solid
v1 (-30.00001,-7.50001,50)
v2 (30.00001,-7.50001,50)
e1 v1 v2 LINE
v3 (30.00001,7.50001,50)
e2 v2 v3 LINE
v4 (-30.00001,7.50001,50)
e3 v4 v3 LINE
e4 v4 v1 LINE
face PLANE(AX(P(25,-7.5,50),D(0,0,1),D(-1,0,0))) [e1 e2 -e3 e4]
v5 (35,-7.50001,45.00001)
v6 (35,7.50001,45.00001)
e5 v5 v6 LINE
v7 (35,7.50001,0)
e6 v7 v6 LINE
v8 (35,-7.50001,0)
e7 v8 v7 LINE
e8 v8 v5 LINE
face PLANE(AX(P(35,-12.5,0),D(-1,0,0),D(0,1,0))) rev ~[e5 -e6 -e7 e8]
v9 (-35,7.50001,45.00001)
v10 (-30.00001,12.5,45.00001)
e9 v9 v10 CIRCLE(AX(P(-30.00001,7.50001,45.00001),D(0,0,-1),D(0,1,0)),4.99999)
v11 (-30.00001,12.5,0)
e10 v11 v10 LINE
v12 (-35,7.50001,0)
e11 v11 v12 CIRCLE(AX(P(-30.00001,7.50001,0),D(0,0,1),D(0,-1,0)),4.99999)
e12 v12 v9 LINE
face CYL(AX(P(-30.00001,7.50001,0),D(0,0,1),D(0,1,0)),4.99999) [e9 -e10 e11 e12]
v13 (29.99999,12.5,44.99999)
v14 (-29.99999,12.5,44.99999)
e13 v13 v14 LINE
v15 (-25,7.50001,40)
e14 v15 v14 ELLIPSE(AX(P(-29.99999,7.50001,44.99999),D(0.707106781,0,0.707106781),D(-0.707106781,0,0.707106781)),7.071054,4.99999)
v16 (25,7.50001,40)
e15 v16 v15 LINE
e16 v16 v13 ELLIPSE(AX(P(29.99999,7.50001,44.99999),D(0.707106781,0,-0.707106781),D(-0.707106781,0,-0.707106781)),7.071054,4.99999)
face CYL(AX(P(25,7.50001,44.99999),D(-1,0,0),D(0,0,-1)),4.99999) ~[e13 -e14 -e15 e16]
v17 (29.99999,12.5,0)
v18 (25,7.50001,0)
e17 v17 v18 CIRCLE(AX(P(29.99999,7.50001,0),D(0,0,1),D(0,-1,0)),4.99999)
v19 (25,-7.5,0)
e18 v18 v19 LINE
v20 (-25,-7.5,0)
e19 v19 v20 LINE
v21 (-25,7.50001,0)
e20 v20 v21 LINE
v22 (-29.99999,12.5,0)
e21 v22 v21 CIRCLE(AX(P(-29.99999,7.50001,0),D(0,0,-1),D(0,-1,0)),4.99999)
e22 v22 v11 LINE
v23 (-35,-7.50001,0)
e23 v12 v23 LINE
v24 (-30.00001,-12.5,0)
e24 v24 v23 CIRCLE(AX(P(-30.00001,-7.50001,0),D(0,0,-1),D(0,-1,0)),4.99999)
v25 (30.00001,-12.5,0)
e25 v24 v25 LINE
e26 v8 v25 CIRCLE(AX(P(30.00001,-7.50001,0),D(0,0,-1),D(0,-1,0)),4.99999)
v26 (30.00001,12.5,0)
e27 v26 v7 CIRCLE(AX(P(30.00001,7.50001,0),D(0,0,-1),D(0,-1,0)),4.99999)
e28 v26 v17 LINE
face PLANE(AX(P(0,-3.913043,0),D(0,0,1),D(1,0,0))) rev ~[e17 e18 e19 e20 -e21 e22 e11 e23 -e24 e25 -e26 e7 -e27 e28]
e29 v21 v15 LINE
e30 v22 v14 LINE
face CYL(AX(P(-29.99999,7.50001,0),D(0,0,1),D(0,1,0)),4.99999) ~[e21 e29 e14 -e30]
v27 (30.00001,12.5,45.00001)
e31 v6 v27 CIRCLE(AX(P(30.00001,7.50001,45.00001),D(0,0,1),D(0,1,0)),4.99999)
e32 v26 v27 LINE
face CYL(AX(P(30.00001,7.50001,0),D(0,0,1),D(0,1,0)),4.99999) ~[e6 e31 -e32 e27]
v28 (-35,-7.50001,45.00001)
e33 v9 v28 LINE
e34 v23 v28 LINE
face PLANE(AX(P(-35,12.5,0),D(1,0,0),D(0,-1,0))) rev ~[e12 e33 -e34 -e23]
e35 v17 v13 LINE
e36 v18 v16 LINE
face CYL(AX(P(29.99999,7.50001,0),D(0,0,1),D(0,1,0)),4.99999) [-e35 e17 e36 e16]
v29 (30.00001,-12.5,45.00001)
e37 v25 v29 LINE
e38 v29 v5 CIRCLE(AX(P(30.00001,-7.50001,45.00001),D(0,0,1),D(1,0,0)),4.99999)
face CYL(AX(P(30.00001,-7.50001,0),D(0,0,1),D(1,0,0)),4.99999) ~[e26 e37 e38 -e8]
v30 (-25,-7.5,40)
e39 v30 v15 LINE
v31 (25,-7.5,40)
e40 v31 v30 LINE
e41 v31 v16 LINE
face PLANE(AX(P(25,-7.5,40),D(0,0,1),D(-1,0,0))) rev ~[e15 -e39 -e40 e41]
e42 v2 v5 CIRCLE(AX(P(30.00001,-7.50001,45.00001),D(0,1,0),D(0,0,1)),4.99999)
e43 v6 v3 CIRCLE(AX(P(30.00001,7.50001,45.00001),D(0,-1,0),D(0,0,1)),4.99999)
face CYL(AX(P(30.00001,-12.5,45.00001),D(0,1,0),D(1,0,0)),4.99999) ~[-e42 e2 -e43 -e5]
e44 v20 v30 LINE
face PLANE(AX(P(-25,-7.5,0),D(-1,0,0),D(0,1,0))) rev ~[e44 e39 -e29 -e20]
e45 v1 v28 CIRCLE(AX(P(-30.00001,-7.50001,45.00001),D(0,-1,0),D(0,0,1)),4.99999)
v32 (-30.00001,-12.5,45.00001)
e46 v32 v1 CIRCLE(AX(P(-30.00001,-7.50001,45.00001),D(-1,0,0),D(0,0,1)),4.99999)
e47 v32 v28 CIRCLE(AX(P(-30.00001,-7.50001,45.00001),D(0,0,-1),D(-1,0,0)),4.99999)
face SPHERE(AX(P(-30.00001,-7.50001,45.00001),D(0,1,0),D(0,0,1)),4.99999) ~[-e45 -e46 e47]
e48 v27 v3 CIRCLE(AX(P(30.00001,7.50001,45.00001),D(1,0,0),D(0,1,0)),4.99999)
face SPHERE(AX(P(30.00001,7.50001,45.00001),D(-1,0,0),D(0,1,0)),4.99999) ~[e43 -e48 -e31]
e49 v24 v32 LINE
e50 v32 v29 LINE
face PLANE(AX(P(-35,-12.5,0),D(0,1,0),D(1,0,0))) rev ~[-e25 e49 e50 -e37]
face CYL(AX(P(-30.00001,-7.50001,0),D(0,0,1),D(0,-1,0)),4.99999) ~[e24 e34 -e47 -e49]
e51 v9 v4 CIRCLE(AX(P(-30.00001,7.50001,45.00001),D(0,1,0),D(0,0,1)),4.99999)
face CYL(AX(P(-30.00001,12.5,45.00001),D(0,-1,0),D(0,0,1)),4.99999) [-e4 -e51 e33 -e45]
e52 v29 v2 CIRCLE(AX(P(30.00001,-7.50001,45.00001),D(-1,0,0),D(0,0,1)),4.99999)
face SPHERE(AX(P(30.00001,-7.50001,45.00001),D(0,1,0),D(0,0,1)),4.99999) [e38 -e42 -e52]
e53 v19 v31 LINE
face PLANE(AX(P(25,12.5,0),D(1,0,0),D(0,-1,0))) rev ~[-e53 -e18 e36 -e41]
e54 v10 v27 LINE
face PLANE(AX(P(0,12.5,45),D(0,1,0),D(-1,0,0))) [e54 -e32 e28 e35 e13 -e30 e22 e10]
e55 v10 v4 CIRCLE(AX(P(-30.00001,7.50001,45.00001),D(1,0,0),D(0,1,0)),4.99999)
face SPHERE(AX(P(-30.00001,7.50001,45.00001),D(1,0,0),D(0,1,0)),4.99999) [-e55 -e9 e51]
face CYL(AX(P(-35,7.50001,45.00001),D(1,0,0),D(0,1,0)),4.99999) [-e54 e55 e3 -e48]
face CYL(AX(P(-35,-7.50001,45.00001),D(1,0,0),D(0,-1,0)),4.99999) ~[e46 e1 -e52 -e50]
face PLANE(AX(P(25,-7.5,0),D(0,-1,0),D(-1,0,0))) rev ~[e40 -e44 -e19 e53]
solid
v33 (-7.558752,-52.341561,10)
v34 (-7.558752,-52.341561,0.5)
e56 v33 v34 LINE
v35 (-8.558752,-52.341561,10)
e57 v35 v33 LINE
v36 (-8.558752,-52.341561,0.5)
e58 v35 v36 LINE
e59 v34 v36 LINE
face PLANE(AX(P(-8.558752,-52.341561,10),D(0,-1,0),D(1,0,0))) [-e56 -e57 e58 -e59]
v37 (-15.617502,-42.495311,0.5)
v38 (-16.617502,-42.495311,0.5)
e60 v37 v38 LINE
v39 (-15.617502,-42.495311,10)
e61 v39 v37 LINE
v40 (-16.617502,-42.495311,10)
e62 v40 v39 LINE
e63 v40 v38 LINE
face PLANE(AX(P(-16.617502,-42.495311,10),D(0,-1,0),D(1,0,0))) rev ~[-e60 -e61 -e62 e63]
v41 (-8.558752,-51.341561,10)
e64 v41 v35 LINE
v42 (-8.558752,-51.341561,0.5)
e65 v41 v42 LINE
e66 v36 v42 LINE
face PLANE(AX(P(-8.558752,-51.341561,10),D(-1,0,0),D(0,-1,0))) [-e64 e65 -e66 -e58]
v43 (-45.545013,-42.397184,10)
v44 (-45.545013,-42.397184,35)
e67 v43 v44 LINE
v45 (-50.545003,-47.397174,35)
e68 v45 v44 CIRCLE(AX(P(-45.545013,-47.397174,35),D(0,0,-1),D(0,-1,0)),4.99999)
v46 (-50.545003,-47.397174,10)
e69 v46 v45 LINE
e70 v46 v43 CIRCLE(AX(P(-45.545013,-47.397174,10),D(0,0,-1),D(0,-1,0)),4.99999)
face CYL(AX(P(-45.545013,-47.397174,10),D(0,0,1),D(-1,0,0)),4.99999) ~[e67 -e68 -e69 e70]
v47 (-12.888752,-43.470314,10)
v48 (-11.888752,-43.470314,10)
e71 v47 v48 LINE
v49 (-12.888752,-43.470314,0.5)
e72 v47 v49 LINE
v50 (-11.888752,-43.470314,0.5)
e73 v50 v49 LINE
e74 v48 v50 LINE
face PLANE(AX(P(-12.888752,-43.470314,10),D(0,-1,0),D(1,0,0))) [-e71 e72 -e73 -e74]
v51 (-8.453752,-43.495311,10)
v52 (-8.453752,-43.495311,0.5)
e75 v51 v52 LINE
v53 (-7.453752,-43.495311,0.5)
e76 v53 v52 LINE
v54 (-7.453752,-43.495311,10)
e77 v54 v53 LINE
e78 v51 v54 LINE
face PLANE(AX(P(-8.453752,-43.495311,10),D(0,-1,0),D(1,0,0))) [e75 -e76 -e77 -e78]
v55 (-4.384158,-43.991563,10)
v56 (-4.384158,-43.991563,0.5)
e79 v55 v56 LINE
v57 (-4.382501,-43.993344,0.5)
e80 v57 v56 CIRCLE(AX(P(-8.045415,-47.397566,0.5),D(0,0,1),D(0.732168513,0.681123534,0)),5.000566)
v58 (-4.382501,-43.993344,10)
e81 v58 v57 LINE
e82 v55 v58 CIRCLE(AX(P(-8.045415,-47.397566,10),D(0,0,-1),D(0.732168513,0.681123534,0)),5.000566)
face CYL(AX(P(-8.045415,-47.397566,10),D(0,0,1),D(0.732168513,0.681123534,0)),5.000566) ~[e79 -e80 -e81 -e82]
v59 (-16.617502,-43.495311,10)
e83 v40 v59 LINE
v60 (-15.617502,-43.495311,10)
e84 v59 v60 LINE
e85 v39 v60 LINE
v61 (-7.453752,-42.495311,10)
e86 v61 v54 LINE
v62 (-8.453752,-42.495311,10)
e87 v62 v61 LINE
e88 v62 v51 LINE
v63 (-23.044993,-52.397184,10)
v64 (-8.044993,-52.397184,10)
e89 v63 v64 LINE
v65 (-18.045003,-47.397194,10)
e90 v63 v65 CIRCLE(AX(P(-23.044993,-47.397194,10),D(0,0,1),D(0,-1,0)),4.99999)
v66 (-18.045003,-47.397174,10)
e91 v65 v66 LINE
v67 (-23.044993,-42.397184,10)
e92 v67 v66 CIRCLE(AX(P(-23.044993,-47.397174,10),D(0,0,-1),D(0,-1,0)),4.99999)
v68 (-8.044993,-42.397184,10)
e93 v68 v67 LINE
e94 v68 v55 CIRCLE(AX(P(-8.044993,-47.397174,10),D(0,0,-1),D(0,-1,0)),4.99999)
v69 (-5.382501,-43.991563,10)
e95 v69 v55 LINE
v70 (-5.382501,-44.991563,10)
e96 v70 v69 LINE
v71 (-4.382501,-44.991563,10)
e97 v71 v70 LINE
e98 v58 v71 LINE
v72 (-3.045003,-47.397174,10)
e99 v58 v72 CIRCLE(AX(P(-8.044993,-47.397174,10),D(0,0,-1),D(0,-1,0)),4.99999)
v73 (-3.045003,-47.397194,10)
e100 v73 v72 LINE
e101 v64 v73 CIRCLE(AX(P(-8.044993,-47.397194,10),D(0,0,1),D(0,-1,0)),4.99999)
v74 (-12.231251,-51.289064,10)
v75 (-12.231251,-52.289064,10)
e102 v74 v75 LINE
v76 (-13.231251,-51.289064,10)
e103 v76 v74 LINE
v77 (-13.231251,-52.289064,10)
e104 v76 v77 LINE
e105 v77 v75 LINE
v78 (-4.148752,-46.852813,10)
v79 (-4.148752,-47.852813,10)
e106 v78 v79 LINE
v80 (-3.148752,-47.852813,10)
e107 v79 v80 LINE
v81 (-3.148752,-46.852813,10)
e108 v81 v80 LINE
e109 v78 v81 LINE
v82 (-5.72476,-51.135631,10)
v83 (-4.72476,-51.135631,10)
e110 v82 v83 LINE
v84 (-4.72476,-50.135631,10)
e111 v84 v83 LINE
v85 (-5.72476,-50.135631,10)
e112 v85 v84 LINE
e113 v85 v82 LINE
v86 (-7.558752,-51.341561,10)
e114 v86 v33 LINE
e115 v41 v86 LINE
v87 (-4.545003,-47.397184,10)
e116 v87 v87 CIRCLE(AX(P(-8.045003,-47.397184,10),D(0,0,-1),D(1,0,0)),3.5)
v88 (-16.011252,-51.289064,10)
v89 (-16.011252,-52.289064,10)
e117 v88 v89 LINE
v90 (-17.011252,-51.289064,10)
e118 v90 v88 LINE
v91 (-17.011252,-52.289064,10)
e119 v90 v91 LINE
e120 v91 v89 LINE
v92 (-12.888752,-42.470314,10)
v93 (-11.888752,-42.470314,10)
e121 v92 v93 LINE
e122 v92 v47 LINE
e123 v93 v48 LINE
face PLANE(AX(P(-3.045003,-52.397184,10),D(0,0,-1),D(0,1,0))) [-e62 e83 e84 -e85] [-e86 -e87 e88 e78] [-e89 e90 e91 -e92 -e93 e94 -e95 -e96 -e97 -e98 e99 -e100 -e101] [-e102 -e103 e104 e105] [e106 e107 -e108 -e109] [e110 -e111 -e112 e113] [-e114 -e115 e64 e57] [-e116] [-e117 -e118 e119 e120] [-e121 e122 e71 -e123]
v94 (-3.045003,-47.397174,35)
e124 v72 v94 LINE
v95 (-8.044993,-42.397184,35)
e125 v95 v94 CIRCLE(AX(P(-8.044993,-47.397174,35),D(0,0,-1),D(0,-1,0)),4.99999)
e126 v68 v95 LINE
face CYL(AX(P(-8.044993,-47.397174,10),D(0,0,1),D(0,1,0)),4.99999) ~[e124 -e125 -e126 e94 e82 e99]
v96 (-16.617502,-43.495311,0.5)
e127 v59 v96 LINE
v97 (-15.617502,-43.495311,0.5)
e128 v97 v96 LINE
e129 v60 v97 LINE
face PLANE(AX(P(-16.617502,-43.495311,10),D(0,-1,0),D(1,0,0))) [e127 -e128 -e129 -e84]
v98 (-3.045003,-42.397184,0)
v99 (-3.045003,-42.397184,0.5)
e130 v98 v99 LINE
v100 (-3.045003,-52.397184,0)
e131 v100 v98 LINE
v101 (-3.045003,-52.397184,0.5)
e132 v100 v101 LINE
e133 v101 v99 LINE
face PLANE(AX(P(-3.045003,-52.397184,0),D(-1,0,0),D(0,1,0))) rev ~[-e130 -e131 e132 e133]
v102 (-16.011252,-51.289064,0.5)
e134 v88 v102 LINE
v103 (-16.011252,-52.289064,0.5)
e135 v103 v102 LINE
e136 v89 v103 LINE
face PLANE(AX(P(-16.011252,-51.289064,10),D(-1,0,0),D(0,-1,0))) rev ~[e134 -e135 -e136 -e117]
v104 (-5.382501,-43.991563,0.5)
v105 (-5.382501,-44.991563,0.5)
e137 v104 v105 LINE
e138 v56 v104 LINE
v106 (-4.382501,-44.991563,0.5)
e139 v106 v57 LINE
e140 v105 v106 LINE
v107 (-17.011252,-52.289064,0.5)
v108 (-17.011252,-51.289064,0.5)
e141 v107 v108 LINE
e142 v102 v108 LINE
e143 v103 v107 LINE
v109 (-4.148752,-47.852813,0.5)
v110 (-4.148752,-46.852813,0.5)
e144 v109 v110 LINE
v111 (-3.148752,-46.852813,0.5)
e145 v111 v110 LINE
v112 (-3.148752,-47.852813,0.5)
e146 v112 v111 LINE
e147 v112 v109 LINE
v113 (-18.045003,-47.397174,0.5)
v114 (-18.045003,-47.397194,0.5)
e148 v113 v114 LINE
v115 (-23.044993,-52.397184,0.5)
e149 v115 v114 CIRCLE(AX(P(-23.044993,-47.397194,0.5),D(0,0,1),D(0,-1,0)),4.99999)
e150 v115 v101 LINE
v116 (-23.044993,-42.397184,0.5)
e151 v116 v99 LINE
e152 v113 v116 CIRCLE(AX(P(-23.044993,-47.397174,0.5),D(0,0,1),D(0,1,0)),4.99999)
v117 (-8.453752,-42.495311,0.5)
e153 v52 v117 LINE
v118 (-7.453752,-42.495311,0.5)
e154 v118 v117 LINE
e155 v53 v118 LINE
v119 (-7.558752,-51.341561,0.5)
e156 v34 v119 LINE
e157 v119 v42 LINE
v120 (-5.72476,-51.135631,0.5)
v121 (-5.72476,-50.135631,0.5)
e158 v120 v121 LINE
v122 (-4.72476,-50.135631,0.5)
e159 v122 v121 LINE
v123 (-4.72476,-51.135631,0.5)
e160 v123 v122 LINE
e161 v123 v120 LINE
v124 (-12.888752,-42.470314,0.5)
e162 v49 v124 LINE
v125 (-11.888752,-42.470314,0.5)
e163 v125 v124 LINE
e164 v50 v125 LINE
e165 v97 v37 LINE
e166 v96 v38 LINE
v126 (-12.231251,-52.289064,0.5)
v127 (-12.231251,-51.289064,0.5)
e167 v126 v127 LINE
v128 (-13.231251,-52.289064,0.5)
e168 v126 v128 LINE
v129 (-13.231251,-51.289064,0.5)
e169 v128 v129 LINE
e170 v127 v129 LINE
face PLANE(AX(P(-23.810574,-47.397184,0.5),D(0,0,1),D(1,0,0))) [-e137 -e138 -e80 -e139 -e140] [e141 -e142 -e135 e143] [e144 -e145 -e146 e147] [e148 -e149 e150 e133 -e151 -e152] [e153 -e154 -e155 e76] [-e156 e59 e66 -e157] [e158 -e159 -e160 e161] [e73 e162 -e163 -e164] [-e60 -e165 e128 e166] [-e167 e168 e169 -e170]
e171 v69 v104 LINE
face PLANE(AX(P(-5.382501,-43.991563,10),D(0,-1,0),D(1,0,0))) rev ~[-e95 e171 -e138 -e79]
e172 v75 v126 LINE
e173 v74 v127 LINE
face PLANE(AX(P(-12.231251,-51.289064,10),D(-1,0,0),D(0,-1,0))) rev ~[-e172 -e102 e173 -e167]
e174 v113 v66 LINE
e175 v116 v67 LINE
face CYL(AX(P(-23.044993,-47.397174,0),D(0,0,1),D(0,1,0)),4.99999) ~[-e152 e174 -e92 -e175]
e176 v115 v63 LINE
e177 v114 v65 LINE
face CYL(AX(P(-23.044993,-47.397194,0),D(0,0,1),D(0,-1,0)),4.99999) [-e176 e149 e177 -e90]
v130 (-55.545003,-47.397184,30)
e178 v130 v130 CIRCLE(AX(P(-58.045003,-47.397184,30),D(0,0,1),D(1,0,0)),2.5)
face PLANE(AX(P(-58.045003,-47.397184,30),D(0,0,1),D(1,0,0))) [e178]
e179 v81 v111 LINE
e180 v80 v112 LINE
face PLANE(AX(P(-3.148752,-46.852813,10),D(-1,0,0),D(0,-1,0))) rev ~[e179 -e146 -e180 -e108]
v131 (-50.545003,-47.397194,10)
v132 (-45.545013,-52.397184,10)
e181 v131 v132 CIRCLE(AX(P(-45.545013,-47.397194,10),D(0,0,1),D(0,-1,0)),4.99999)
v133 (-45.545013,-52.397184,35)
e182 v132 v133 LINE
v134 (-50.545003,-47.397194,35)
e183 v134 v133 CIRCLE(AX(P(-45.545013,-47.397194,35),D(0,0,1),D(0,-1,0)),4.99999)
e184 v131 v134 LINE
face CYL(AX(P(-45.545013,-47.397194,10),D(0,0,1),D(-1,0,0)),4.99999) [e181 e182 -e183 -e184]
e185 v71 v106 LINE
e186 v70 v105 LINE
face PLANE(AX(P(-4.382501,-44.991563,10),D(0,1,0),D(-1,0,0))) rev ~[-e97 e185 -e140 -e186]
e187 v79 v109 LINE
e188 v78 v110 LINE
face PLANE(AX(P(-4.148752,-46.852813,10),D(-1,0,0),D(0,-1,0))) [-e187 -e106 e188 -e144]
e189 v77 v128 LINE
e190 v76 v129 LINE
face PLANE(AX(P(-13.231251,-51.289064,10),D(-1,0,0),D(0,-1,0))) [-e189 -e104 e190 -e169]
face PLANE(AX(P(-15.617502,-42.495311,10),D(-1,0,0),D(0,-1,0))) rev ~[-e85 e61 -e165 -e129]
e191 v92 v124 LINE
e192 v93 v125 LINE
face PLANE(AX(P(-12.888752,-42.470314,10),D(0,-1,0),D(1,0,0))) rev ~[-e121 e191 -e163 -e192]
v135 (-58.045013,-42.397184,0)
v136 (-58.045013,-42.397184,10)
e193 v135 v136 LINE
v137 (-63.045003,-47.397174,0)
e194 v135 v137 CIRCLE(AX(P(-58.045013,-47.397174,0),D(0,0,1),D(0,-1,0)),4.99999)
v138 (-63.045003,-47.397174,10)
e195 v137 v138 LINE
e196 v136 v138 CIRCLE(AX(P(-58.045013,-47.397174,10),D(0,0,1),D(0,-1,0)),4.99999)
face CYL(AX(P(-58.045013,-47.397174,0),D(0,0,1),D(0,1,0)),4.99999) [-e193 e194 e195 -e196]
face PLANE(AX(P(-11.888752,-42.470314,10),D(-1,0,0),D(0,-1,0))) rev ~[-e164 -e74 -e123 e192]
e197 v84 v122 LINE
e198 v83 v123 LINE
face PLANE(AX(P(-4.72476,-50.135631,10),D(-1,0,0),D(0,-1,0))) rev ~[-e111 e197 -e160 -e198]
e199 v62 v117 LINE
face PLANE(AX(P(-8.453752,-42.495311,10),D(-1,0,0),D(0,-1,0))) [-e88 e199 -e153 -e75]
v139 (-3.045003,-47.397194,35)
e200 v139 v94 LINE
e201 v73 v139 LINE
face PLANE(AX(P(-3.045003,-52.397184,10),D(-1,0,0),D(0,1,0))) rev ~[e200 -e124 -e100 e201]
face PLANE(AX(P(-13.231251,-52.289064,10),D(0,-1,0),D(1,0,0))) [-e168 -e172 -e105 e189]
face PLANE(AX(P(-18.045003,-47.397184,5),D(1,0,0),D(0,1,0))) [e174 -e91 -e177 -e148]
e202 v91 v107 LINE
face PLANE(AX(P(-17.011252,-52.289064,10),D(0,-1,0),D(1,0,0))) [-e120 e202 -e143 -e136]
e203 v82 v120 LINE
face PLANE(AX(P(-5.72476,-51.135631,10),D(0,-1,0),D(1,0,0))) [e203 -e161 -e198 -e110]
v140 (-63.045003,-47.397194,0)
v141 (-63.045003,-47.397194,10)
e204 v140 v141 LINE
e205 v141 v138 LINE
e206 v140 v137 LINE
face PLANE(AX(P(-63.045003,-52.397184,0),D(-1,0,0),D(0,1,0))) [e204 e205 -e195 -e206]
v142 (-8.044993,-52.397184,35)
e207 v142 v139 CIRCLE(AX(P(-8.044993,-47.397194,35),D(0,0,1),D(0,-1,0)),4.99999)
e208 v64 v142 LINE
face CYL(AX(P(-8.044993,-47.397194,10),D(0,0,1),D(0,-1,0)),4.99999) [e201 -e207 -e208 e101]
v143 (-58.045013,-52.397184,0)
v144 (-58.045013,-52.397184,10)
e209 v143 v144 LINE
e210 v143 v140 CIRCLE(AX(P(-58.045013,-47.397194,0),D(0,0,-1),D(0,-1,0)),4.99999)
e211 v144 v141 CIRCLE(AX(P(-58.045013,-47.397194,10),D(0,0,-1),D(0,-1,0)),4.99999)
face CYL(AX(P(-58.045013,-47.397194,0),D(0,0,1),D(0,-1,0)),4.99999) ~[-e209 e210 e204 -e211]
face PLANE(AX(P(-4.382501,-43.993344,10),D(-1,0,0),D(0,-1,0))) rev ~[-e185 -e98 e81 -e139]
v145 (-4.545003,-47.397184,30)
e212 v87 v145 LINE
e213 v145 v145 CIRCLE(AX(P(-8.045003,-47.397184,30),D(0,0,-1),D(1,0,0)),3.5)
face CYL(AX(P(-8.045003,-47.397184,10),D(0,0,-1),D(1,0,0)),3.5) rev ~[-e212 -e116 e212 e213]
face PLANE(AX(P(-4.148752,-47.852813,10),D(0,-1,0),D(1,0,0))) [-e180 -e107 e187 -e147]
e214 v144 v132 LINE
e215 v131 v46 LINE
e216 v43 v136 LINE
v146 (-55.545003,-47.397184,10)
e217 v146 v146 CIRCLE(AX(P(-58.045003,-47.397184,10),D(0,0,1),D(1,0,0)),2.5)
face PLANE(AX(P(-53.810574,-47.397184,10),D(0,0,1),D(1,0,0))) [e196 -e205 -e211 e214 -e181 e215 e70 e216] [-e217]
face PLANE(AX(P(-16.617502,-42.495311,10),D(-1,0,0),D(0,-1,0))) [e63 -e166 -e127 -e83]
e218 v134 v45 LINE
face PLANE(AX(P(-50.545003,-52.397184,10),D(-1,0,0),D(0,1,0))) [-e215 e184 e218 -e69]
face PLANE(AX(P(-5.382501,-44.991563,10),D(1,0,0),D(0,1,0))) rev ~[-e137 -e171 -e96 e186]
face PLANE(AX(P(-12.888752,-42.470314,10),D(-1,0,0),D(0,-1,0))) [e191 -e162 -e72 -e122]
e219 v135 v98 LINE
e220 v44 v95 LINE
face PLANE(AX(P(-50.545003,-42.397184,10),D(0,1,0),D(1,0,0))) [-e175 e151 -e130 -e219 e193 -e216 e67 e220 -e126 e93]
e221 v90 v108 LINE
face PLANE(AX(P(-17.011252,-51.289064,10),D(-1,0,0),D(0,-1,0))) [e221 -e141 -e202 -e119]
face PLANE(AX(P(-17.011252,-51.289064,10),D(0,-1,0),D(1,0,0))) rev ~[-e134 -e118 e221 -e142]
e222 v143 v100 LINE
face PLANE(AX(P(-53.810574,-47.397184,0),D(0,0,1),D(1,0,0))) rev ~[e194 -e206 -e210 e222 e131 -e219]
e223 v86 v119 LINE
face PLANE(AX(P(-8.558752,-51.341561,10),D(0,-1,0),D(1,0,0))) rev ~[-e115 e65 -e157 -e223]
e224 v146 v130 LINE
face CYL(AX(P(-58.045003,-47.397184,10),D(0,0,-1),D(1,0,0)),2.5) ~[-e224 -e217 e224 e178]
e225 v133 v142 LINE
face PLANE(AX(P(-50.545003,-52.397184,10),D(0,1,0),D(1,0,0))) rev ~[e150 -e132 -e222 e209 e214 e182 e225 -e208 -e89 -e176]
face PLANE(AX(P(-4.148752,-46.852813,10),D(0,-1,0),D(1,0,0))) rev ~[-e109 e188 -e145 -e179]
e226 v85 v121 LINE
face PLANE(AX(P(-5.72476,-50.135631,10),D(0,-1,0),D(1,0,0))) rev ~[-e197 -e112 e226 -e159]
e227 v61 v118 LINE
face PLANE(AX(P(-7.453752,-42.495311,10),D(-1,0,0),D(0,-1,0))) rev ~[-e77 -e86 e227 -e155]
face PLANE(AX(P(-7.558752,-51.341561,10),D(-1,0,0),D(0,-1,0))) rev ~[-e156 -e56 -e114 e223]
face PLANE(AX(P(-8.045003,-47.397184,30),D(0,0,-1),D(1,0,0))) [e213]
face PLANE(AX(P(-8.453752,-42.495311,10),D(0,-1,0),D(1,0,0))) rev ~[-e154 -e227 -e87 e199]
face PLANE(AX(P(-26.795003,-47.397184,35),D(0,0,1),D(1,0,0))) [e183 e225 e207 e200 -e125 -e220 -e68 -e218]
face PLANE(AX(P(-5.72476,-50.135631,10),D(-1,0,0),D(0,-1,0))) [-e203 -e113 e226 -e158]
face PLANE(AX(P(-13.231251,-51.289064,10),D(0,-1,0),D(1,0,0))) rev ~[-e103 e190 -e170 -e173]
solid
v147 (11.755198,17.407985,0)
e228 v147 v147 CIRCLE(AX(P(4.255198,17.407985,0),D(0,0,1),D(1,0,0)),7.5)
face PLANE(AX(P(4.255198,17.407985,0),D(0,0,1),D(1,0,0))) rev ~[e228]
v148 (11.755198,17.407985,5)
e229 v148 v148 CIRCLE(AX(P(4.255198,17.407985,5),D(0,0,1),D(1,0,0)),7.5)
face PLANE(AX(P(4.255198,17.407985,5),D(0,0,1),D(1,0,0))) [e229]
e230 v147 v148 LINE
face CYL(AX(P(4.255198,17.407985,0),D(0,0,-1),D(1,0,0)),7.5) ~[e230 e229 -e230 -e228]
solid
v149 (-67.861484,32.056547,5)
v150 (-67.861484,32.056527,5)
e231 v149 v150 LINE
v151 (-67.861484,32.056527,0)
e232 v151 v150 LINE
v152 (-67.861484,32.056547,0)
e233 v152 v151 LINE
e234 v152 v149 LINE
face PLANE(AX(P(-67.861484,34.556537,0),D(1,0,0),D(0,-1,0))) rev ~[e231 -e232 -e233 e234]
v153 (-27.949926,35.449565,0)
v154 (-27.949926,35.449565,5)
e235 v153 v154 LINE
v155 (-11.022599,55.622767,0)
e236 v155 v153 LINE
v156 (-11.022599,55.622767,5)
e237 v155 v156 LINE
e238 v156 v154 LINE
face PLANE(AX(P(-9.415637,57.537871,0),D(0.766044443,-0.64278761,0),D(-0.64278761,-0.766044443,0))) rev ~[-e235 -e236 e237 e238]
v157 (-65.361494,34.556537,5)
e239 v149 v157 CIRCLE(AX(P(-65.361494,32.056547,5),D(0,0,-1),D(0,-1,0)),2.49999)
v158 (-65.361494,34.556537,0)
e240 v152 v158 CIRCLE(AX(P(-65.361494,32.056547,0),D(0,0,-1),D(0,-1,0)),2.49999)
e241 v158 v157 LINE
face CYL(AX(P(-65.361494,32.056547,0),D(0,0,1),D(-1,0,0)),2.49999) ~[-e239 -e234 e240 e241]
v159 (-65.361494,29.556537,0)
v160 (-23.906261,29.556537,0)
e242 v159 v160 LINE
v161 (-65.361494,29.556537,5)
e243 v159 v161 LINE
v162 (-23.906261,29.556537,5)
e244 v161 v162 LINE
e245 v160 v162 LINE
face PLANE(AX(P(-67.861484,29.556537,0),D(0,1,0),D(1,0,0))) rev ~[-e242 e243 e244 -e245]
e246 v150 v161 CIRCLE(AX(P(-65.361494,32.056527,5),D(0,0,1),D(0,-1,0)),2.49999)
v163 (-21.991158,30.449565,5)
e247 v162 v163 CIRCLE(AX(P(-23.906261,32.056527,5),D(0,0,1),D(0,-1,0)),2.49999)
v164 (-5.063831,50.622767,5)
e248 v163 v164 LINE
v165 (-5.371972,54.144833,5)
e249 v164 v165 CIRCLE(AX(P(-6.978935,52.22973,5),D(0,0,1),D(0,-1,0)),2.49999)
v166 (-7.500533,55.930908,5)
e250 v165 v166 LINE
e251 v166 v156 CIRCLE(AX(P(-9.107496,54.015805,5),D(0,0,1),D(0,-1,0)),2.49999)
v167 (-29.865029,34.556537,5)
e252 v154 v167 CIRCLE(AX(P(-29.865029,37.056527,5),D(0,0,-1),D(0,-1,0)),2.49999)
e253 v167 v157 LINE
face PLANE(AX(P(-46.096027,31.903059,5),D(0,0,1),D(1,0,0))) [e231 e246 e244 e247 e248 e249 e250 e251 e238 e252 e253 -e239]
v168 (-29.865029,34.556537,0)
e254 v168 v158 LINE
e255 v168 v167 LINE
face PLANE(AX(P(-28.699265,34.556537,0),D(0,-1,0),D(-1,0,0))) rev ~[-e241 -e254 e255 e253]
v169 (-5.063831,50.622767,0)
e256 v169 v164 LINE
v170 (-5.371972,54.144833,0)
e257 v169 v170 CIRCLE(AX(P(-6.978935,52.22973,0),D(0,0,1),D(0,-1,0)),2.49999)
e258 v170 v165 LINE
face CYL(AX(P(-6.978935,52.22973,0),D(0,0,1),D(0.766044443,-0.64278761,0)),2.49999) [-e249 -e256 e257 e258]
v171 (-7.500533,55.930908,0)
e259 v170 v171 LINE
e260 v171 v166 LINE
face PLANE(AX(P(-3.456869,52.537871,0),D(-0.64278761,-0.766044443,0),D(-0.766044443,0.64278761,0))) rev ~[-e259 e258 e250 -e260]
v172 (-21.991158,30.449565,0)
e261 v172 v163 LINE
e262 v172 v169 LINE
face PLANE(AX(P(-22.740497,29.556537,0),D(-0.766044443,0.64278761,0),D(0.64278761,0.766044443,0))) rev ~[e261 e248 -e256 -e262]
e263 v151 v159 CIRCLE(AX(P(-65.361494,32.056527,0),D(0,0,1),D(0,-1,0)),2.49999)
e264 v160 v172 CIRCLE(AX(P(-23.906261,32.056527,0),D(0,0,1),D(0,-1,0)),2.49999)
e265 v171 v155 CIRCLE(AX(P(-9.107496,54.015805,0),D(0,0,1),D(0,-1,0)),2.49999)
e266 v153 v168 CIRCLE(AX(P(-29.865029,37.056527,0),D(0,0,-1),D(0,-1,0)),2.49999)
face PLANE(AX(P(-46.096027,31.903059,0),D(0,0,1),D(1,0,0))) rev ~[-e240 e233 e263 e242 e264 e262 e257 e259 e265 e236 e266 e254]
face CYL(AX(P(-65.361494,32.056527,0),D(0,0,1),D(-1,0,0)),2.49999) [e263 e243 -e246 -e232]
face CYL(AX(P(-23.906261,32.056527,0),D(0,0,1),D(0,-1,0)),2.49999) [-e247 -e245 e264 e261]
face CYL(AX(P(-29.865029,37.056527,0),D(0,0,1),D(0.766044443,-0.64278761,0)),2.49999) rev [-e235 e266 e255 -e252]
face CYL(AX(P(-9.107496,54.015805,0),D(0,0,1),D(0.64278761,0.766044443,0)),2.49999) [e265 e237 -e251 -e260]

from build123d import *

# Parameters (mm, degrees)
F1_DEPTH  = 5
F0_R      = 7.5
F2_R      = 2.49999
F3_DEPTH  = 50
F4_W      = 50
F4_H      = 10
F5_DEPTH  = 20
F6_R      = 4.99999
F0_W      = 18.4688572213
F0_H      = 10
F0_W_2    = 41.5311427787
F7_DEPTH  = 10
F8_W      = 47.5
F8_H      = 10
F9_DEPTH  = 25
F10_W     = 10
F10_H     = 10
F11_DEPTH = 15
F12_R     = 3.5
F13_DEPTH = 20
F8_R      = 2.5
F14_DEPTH = 20
F15_R     = 4.99999
F16_W     = 1
F16_H     = 1
F17_DEPTH = 10
F18_DEPTH = 0.5


# Not quite as in the source:
# - a fillet or chamfer is up to 0.001 mm smaller than in the source, because OpenCascade refuses the exact size


with BuildPart() as f1:
    # F0 (on Top) → F1 (new body)
    with BuildSketch(Plane.XY):
        Polygon((-67.8614835593, 34.5565372526), (-67.8614835593, 29.5565372526), (-22.7404969164, 29.5565372526), (-28.6992648794, 34.5565372526), align=None)
        Polygon((-28.6992648794, 34.5565372526), (-22.7404969164, 29.5565372526), (-3.4568686258, 52.5378705461), (-9.4156365888, 57.5378705461), align=None)
    extrude(amount=F1_DEPTH)

    # F2 (radius 2.5 in the source; OpenCascade refuses exactly that, so slightly less here)
    f2_edges = [f1.edges().sort_by_distance(p)[0] for p in [
        (-28.699265, 34.556537, 2.5),
        (-67.861484, 34.556537, 2.5),
        (-67.861484, 29.556537, 2.5),
        (-22.740497, 29.556537, 2.5),
        (-3.456869, 52.537871, 2.5),
        (-9.415637, 57.537871, 2.5),
    ]]
    fillet(f2_edges, radius=F2_R)


with BuildPart() as f1b:
    # F0 (on Top) → F1, piece 2 (new body)
    with BuildSketch(Plane.XY):
        with Locations((4.2551979423, 17.4079854041)):
            Circle(F0_R)
    extrude(amount=F1_DEPTH)


with BuildPart() as f3:
    # F0 (on Top) → F3 (new body)
    with BuildSketch(Plane.XY):
        Polygon((-35, -12.5), (35, -12.5), (35, 12.5), (25, 12.5), (25, -7.5), (-25, -7.5), (-25, 12.5), (-35, 12.5), align=None)
    extrude(amount=F3_DEPTH)

    # F4 (on face) → F5 (join)
    with BuildSketch(Plane(origin=(0, -7.5, 0), x_dir=(-1, 0, 0), z_dir=(0, 1, 0))):
        with Locations((0, 45)):
            Rectangle(F4_W, F4_H)
    extrude(amount=F5_DEPTH)

    # F6 (radius 5 in the source; OpenCascade refuses exactly that, so slightly less here)
    f6_edges = [f3.edges().sort_by_distance(p)[0] for p in [
        (0, 12.5, 40),
        (25, 12.5, 20),
        (-25, 12.5, 20),
        (0, 12.5, 50),
        (35, 12.5, 25),
        (-35, 12.5, 25),
        (-35, 0, 50),
        (35, 0, 50),
        (0, -12.5, 50),
        (35, -12.5, 25),
        (-35, -12.5, 25),
    ]]
    fillet(f6_edges, radius=F6_R)


with BuildPart() as f7:
    # F0 (on Top) → F7 (new body)
    with BuildSketch(Plane.XY):
        with Locations((-53.8105743192, -47.3971840739)):
            Rectangle(F0_W, F0_H)
        with Locations((-23.8105743192, -47.3971840739)):
            Rectangle(F0_W_2, F0_H)
    extrude(amount=F7_DEPTH)

    # F8 (on face) → F9 (join)
    with BuildSketch(Plane.XY.offset(10)):
        with Locations((-26.7950029299, -47.3971840739)):
            Rectangle(F8_W, F8_H)
    extrude(amount=F9_DEPTH)

    # F10 (on face) → F11 (cut)
    with BuildSketch(Plane.YZ.offset(-3.0450029299)):
        with Locations((-47.3971840739, 5)):
            Rectangle(F10_W, F10_H)
    extrude(amount=-F11_DEPTH, mode=Mode.SUBTRACT)

    # F12 (on face) → F13 (cut)
    with BuildSketch(Plane(origin=(0, 0, 10), x_dir=(1, 0, 0), z_dir=(0, 0, -1))):
        with Locations((-8.0450029299, 47.3971840739)):
            Circle(F12_R)
    extrude(amount=-F13_DEPTH, mode=Mode.SUBTRACT)

    # F8 (on face) → F14 (join)
    with BuildSketch(Plane.XY.offset(10)):
        with Locations((-58.0450029299, -47.3971840739)):
            Circle(F8_R)
    extrude(amount=F14_DEPTH)

    # F15 (radius 5 in the source; OpenCascade refuses exactly that, so slightly less here)
    f15_edges = [f7.edges().sort_by_distance(p)[0] for p in [
        (-50.545003, -52.397184, 22.5),
        (-50.545003, -42.397184, 22.5),
        (-63.045003, -52.397184, 5),
        (-63.045003, -42.397184, 5),
        (-3.045003, -42.397184, 22.5),
        (-3.045003, -52.397184, 22.5),
        (-18.045003, -52.397184, 5),
        (-18.045003, -42.397184, 5),
    ]]
    fillet(f15_edges, radius=F15_R)

    # F16 (on face) → F17 (join)
    with BuildSketch(Plane(origin=(0, 0, 10), x_dir=(1, 0, 0), z_dir=(0, 0, -1))):
        with Locations((-16.5112521499, 51.7890639603)):
            Rectangle(F16_W, F16_H)
        with Locations((-12.7312513068, 51.7890639603)):
            Rectangle(F16_W, F16_H)
        with Locations((-8.0587519333, 51.8415607512)):
            Rectangle(F16_W, F16_H)
        with Locations((-5.2247602621, 50.6356314291)):
            Rectangle(F16_W, F16_H)
        with Locations((-3.6487516481, 47.3528131843)):
            Rectangle(F16_W, F16_H)
        with BuildLine():
            Line((-4.3825014383, 43.9933444551), (-4.3825014383, 44.9915629923))
            Line((-4.3825014383, 44.9915629923), (-5.3825014383, 44.9915629923))
            Line((-5.3825014383, 44.9915629923), (-5.3825014383, 43.9915629923))
            Line((-5.3825014383, 43.9915629923), (-4.3841578938, 43.9915629923))
            ThreePointArc((-4.3841578938, 43.9915629923), (-4.3833295577, 43.992453623), (-4.3825014383, 43.9933444551))
        make_face()
        with Locations((-7.9537518322, 42.9953113198)):
            Rectangle(F16_W, F16_H)
        with Locations((-12.388751924, 42.9703136086)):
            Rectangle(F16_W, F16_H)
        with Locations((-16.1175020039, 42.9953113198)):
            Rectangle(F16_W, F16_H)
    extrude(amount=F17_DEPTH)

    # F0 (on Top) → F18 (join)
    with BuildSketch(Plane.XY):
        with Locations((-23.8105743192, -47.3971840739)):
            Rectangle(F0_W_2, F0_H)
    extrude(amount=F18_DEPTH)


solid = Compound([f1.part, f1b.part, f3.part, f7.part])
